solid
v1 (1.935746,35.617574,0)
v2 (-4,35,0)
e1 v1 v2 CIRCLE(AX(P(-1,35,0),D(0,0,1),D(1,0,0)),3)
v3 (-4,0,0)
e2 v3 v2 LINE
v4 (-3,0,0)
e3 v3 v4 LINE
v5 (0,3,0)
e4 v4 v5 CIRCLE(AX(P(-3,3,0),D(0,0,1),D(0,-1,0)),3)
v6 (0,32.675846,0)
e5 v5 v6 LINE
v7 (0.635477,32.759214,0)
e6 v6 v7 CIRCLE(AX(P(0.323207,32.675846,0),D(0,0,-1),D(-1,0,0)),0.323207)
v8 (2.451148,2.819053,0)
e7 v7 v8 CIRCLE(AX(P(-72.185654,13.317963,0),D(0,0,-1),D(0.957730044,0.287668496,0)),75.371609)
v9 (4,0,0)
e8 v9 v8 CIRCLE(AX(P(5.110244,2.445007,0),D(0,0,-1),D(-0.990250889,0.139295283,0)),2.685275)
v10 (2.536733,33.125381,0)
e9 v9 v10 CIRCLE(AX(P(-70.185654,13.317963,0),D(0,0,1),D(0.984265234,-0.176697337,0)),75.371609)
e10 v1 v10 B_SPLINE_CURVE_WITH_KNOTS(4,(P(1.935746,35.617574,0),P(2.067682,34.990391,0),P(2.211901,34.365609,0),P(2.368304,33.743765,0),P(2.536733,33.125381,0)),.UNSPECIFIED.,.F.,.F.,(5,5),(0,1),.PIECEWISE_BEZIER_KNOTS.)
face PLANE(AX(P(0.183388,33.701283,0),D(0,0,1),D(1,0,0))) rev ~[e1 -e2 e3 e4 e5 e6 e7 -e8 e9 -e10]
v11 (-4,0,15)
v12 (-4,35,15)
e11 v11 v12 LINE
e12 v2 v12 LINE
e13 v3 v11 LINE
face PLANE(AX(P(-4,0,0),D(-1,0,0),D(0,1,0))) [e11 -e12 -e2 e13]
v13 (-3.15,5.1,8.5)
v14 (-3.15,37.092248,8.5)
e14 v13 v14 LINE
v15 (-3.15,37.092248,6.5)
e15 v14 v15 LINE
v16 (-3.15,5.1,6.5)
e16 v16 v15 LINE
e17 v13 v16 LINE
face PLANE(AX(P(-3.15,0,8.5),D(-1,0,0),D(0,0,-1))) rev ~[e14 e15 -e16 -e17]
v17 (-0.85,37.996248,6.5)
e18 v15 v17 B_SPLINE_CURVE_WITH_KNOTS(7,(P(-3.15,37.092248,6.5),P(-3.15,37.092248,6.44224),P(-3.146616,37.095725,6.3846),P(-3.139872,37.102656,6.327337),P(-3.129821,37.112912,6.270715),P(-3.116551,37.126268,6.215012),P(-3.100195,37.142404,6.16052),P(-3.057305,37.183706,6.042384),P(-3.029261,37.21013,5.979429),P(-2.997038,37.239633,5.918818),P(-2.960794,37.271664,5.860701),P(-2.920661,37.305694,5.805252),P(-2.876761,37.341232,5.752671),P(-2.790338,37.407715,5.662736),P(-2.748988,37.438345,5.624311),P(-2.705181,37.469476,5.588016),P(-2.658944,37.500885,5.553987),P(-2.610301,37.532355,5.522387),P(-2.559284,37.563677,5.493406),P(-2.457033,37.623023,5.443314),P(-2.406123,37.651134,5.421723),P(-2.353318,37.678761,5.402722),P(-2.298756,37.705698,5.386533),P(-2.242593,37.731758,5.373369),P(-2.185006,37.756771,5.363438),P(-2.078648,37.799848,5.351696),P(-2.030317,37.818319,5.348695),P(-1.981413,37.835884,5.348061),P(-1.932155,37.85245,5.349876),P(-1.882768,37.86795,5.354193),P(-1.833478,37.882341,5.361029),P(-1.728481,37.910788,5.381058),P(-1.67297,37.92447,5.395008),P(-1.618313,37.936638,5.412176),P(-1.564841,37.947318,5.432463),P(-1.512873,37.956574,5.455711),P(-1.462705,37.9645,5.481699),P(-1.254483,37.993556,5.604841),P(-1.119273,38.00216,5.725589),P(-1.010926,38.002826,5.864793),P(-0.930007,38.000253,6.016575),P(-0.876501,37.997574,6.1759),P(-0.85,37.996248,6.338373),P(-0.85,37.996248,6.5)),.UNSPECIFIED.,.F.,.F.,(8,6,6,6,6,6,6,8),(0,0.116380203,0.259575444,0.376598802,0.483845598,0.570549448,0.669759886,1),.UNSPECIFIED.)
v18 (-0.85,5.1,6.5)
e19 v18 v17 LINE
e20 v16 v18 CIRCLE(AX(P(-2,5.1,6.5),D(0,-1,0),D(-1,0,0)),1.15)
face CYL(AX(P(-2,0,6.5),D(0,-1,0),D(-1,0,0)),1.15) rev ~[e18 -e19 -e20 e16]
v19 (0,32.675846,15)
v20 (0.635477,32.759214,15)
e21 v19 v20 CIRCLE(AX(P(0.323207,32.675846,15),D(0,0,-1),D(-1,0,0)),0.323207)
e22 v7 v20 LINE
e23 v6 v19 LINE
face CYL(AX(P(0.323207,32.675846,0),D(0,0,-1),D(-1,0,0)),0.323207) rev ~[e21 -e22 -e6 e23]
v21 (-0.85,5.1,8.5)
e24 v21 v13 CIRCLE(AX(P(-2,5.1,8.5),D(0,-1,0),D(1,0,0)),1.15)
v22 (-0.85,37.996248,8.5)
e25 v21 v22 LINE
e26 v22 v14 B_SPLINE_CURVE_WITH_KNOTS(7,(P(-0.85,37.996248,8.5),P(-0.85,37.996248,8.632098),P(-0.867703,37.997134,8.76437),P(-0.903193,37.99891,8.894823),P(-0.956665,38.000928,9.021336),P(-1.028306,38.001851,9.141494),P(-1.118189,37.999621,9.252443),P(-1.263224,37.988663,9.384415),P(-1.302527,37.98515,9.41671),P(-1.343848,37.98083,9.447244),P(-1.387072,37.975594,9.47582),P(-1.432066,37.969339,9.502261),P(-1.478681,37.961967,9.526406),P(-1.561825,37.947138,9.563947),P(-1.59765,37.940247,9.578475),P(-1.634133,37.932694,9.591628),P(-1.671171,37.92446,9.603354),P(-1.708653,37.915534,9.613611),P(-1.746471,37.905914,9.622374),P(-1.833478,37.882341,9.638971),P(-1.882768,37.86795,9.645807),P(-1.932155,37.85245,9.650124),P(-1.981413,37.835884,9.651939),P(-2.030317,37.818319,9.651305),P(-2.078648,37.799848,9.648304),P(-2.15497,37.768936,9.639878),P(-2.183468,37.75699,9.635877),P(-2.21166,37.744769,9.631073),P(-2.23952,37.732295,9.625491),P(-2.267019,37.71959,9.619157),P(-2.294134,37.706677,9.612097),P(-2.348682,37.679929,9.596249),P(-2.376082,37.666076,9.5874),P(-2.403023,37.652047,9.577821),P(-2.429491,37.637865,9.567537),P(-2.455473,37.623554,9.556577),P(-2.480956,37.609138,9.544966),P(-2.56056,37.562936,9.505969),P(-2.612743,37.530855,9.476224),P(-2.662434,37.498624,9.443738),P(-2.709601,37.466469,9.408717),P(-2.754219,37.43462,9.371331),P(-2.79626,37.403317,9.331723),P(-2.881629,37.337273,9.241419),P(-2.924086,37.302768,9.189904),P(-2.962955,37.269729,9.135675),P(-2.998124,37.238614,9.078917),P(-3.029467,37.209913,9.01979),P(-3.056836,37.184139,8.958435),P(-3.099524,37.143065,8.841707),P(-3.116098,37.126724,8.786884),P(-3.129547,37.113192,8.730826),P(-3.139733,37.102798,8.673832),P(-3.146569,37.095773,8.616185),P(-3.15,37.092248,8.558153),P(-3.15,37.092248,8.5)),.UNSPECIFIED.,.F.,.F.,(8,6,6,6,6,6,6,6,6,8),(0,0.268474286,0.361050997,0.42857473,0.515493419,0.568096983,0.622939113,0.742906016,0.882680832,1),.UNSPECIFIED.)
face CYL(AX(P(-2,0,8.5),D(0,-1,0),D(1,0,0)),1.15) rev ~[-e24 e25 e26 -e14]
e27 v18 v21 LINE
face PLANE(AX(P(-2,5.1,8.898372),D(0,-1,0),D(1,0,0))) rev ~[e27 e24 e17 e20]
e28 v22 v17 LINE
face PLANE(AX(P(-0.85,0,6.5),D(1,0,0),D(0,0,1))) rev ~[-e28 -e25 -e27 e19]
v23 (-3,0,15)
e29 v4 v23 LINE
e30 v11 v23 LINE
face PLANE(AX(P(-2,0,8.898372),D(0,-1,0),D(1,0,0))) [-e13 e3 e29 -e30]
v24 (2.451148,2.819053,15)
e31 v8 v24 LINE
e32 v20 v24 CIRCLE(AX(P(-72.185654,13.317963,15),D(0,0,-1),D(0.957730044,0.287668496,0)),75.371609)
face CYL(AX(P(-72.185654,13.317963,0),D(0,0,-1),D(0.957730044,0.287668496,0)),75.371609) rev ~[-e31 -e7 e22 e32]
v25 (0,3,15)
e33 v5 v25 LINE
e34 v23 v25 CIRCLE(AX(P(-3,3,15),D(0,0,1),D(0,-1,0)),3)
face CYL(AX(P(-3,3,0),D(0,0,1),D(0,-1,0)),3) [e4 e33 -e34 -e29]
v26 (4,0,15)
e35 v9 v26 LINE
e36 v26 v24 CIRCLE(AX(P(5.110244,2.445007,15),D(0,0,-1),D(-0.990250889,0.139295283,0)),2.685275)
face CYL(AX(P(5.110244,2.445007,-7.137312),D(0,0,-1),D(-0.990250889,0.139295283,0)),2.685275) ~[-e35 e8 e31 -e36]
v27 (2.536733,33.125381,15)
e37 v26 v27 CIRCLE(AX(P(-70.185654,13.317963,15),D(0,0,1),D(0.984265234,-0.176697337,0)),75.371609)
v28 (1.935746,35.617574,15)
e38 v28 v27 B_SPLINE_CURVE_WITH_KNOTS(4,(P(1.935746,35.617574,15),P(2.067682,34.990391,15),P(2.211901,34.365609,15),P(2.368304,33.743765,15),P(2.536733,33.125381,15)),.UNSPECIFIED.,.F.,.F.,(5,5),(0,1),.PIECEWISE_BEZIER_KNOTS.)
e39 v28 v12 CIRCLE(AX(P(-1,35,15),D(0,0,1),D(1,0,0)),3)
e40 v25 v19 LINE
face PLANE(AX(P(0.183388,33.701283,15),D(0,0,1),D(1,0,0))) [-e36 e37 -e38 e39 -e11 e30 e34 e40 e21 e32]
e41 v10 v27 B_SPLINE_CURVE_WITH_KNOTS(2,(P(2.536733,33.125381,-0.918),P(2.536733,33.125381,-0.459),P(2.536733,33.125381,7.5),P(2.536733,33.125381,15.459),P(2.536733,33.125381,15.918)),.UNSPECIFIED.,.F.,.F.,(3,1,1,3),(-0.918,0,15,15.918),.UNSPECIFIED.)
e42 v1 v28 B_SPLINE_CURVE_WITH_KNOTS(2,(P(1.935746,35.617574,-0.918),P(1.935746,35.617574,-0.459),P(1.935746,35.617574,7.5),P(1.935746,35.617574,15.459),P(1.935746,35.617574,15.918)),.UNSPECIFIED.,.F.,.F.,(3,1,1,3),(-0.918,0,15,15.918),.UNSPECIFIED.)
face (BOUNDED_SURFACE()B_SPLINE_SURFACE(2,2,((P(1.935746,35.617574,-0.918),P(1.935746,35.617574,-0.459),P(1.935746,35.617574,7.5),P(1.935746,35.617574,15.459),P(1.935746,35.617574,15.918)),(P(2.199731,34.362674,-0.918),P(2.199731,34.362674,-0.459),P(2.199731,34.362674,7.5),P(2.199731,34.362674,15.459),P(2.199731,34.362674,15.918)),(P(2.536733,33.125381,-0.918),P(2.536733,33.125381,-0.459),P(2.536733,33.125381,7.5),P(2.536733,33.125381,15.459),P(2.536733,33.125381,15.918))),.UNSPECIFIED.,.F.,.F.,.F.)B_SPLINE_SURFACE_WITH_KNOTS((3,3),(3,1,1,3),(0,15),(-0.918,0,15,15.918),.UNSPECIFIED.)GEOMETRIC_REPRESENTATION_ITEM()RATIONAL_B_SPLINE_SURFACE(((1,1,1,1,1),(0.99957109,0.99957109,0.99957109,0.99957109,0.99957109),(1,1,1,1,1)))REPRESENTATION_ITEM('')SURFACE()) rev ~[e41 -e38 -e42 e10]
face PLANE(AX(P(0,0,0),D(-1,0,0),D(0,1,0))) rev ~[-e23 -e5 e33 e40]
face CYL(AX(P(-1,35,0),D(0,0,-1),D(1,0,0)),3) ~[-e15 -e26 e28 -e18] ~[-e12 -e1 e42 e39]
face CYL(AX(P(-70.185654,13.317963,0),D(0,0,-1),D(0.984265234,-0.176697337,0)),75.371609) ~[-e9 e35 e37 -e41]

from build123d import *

# Parameters (mm, degrees)
F0_W        = 4
F0_H        = 35
F1_DEPTH    = 15
F2_T1_DEPTH = 15
F3_T1_DEPTH = 29.2746233567
F5_DEPTH    = 47
F6_DEPTH    = 5.1
F7_R        = 3
F8_R        = 43.7697785777


# Not quite as in the source:
# - a fillet or chamfer that OpenCascade refuses, or shapes differently, is made with other operations: its cross-section is extruded or revolved along the edge and cut away or added


with BuildPart() as f1:
    # F0 (on Top) → F1 (new body)
    with BuildSketch(Plane.XY):
        with Locations((-2, 17.5)):
            Rectangle(F0_W, F0_H)
        with BuildLine():
            Line((-4, 35), (0, 35))
            ThreePointArc((0, 35), (3.0631994803, 17.6178971132), (2, 0))
            Line((2, 0), (4, 0))
            ThreePointArc((4, 0), (5.0631994803, 17.6178971132), (2, 35))
            ThreePointArc((2, 35), (-1, 38), (-4, 35))
        make_face()
    extrude(amount=F1_DEPTH)

    # F2: fillet of radius 0.3232070394 on 1 edges, made by hand

    # F2_s2 → F2_t1 (join)
    with BuildSketch(Plane.XY):
        with BuildLine():
            ThreePointArc((0, 32.6758460939), (0.2811660755, 32.9963072424), (0.635477172, 32.7592136813))
            ThreePointArc((0.635477172, 32.7592136813), (0.3263947733, 33.8820616974), (0, 35))
            Line((0, 35), (0, 32.6758460939))
        make_face()
    extrude(amount=F2_T1_DEPTH)

    # F3: fillet of radius 2.6852748766 on 1 edges, made by hand

    # F3_s2 → F3_t1 (cut)
    with BuildSketch(Plane.XY.offset(-7.1373116784)):
        with BuildLine():
            ThreePointArc((2.4511484812, 2.8190530195), (2.7567902003, 1.1519659503), (4, 0))
            Line((4, 0), (2, 0))
            ThreePointArc((2, 0), (2.2389229437, 1.4073902438), (2.4511484812, 2.8190530195))
        make_face()
    extrude(amount=F3_T1_DEPTH, mode=Mode.SUBTRACT)

    # F4 (on face) → F5 (cut)
    with BuildSketch(Plane.XZ):
        with BuildLine():
            ThreePointArc((-3.15, 6.5), (-2, 5.35), (-0.85, 6.5))
            Line((-0.85, 6.5), (-2, 6.5))
            Line((-2, 6.5), (-3.15, 6.5))
        make_face()
        with BuildLine():
            ThreePointArc((-0.85, 6.5), (-1.0061251438, 7.0785436631), (-1.4321091654, 7.5))
            ThreePointArc((-1.4321091654, 7.5), (-2, 7.35), (-2.5678908346, 7.5))
            ThreePointArc((-2.5678908346, 7.5), (-2.9938748562, 7.0785436631), (-3.15, 6.5))
            Line((-3.15, 6.5), (-2, 6.5))
            Line((-2, 6.5), (-0.85, 6.5))
        make_face()
        with BuildLine():
            ThreePointArc((-2.5678908346, 7.5), (-2.9938748562, 7.9214563369), (-3.15, 8.5))
            Line((-3.15, 8.5), (-3.15, 6.5))
            ThreePointArc((-3.15, 6.5), (-2.9938748562, 7.0785436631), (-2.5678908346, 7.5))
        make_face()
        with BuildLine():
            Line((-0.85, 6.5), (-0.85, 8.5))
            ThreePointArc((-0.85, 8.5), (-1.0061251438, 7.9214563369), (-1.4321091654, 7.5))
            ThreePointArc((-1.4321091654, 7.5), (-1.0061251438, 7.0785436631), (-0.85, 6.5))
        make_face()
        with BuildLine():
            ThreePointArc((-1.4321091654, 7.5), (-1.0061251438, 7.9214563369), (-0.85, 8.5))
            Line((-0.85, 8.5), (-2, 8.5))
            Line((-2, 8.5), (-3.15, 8.5))
            ThreePointArc((-3.15, 8.5), (-2.9938748562, 7.9214563369), (-2.5678908346, 7.5))
            ThreePointArc((-2.5678908346, 7.5), (-2, 7.35), (-1.4321091654, 7.5))
        make_face()
        with BuildLine():
            Line((-2, 8.5), (-0.85, 8.5))
            ThreePointArc((-0.85, 8.5), (-2, 9.65), (-3.15, 8.5))
            Line((-3.15, 8.5), (-2, 8.5))
        make_face()
    extrude(amount=-F5_DEPTH, mode=Mode.SUBTRACT)

    # F4 (on face) → F6 (join)
    with BuildSketch(Plane.XZ):
        with BuildLine():
            Line((-2, 8.5), (-0.85, 8.5))
            ThreePointArc((-0.85, 8.5), (-2, 9.65), (-3.15, 8.5))
            Line((-3.15, 8.5), (-2, 8.5))
        make_face()
        with BuildLine():
            ThreePointArc((-1.4321091654, 7.5), (-1.0061251438, 7.9214563369), (-0.85, 8.5))
            Line((-0.85, 8.5), (-2, 8.5))
            Line((-2, 8.5), (-3.15, 8.5))
            ThreePointArc((-3.15, 8.5), (-2.9938748562, 7.9214563369), (-2.5678908346, 7.5))
            ThreePointArc((-2.5678908346, 7.5), (-2, 7.35), (-1.4321091654, 7.5))
        make_face()
        with BuildLine():
            ThreePointArc((-3.15, 6.5), (-2, 5.35), (-0.85, 6.5))
            Line((-0.85, 6.5), (-2, 6.5))
            Line((-2, 6.5), (-3.15, 6.5))
        make_face()
        with BuildLine():
            ThreePointArc((-0.85, 6.5), (-1.0061251438, 7.0785436631), (-1.4321091654, 7.5))
            ThreePointArc((-1.4321091654, 7.5), (-2, 7.35), (-2.5678908346, 7.5))
            ThreePointArc((-2.5678908346, 7.5), (-2.9938748562, 7.0785436631), (-3.15, 6.5))
            Line((-3.15, 6.5), (-2, 6.5))
            Line((-2, 6.5), (-0.85, 6.5))
        make_face()
        with BuildLine():
            Line((-0.85, 6.5), (-0.85, 8.5))
            ThreePointArc((-0.85, 8.5), (-1.0061251438, 7.9214563369), (-1.4321091654, 7.5))
            ThreePointArc((-1.4321091654, 7.5), (-1.0061251438, 7.0785436631), (-0.85, 6.5))
        make_face()
        with BuildLine():
            ThreePointArc((-2.5678908346, 7.5), (-2.9938748562, 7.9214563369), (-3.15, 8.5))
            Line((-3.15, 8.5), (-3.15, 6.5))
            ThreePointArc((-3.15, 6.5), (-2.9938748562, 7.0785436631), (-2.5678908346, 7.5))
        make_face()
    extrude(amount=-F6_DEPTH)

    # F7
    f7_edges = [f1.edges().sort_by_distance(p)[0] for p in [
        (0, 0, 7.5),
    ]]
    fillet(f7_edges, radius=F7_R)

    # F8
    f8_edges = [f1.edges().sort_by_distance(p)[0] for p in [
        (2, 35, 7.5),
    ]]
    fillet(f8_edges, radius=F8_R)


solid = f1.part
